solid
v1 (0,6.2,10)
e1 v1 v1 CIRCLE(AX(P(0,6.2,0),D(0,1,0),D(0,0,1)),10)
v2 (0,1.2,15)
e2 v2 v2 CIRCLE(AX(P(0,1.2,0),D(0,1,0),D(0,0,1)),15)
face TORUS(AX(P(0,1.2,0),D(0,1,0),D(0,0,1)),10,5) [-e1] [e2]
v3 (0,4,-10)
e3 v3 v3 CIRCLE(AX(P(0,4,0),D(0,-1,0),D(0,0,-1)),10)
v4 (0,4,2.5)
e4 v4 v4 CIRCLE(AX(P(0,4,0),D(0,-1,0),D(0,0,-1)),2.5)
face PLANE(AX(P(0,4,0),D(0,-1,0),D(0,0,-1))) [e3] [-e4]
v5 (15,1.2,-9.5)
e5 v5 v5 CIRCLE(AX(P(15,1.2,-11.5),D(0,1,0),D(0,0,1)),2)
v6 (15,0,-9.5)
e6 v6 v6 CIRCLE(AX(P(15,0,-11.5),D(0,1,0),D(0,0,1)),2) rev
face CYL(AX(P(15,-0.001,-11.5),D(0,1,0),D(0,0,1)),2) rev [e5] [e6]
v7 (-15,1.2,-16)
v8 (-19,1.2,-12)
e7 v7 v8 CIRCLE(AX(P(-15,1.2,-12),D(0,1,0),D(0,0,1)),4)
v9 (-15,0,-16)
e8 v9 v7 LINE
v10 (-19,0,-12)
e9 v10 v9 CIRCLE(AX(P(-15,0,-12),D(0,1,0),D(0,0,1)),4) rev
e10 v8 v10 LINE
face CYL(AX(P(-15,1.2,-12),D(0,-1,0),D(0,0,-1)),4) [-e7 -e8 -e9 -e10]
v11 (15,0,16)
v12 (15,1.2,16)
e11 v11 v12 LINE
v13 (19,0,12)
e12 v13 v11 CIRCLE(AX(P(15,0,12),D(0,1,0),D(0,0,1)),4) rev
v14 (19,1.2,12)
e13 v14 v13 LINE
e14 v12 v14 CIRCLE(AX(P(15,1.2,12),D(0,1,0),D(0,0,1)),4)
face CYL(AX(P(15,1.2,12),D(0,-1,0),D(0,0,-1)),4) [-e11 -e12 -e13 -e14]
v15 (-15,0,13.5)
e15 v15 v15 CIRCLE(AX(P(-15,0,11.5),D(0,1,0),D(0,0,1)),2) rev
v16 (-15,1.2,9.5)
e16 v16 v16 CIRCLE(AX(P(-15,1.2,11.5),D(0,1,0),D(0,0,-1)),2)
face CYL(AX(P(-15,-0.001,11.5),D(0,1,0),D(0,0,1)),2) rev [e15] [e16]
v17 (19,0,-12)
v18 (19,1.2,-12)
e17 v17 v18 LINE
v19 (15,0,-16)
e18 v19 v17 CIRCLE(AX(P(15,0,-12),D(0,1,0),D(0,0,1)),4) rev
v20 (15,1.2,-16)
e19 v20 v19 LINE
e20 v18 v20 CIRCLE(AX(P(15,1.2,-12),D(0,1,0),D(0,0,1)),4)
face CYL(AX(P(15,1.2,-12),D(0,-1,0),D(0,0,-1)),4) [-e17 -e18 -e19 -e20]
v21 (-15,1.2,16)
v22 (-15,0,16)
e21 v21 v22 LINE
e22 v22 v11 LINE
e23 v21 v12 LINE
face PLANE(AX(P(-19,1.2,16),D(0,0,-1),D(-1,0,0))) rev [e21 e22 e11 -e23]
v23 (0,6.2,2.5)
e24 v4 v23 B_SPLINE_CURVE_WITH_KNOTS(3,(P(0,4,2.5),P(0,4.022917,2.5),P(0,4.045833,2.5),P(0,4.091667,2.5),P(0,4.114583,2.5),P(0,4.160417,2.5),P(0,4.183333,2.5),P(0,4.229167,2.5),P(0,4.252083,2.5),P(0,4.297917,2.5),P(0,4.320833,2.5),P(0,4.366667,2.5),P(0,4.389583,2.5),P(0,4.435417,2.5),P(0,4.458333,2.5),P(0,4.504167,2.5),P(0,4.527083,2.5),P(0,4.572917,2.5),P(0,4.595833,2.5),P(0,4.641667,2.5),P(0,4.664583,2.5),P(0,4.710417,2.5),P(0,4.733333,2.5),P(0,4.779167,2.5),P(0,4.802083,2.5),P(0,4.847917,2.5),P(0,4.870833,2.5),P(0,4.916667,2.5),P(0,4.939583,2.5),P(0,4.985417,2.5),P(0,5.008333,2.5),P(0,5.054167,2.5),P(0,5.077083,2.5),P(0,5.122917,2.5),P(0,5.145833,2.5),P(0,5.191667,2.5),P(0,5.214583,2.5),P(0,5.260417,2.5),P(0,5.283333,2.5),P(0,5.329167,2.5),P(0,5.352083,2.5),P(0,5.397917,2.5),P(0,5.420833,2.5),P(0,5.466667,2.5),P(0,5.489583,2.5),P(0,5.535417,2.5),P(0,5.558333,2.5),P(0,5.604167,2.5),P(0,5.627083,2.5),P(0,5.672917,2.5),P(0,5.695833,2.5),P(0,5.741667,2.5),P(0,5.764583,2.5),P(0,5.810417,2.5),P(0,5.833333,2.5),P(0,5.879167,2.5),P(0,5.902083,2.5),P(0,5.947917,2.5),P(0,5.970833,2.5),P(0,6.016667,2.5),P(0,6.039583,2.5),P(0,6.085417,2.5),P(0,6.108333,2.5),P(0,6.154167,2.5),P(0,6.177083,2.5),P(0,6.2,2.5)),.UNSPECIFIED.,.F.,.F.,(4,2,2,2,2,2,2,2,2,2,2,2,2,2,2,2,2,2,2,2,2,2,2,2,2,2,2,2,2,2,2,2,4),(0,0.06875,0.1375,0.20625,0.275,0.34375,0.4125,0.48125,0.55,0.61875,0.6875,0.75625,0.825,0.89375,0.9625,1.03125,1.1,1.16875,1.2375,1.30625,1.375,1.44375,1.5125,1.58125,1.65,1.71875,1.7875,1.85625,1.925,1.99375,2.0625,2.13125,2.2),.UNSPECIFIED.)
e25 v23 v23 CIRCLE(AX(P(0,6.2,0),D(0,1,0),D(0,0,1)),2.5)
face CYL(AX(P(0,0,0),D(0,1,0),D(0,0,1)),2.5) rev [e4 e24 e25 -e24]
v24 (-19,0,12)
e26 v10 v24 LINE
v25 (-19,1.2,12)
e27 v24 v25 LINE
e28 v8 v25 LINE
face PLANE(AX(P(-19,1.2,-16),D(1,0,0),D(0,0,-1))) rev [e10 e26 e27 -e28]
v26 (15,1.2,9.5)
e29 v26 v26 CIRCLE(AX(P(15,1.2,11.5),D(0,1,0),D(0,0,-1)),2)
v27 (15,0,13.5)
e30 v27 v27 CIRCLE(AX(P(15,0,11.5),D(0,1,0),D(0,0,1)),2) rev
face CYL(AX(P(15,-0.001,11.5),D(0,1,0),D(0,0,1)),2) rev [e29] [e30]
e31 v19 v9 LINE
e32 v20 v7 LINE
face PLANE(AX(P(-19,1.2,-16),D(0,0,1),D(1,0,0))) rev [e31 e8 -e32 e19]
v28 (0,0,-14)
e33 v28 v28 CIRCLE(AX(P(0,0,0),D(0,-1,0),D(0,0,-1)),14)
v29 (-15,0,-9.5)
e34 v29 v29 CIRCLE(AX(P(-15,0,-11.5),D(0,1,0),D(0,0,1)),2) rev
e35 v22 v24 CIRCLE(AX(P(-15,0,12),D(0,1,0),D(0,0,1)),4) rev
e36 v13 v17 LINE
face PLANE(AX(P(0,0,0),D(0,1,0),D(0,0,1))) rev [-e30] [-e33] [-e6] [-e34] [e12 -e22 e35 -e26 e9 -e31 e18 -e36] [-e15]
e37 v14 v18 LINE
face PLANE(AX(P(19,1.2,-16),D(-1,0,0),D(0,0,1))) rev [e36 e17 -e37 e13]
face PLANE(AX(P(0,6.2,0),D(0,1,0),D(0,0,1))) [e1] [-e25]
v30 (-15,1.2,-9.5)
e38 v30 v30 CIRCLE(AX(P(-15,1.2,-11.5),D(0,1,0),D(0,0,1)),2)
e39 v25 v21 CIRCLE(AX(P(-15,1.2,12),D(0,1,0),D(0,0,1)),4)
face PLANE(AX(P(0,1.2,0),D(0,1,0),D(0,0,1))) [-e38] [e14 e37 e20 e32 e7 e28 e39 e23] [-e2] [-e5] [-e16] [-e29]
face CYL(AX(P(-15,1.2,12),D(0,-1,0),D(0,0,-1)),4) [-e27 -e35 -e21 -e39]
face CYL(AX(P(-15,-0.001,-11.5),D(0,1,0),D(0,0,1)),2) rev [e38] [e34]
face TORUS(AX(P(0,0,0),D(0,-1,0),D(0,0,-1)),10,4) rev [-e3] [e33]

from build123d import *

# Parameters (mm, degrees)
SKIZZE1_W                       = 38
SKIZZE1_H                       = 32
AUFSATZ_LINEAR_AUSTRAGEN1_DEPTH = 1.2
SKIZZE2_R                       = 15
AUFSATZ_LINEAR_AUSTRAGEN2_DEPTH = 5
VERRUNDUNG1_R                   = 5
SCHNITT_LINEAR_AUSTRAGEN1_REACH = 27.338
SKIZZE3_R                       = 2
SKIZZE4_R                       = 14
SCHNITT_LINEAR_AUSTRAGEN2_DEPTH = 4
VERRUNDUNG2_R                   = 4
SKIZZE5_R                       = 2.5
SCHNITT_LINEAR_AUSTRAGEN3_DEPTH = 26.601562452
VERRUNDUNG3_R                   = 4


with BuildPart() as part:
    # Skizze1 → Aufsatz-Linear austragen1 (new body)
    with BuildSketch(Plane(origin=(0, 0, 0), x_dir=(1, 0, 0), z_dir=(0, 1, 0))):
        Rectangle(SKIZZE1_W, SKIZZE1_H)
    extrude(amount=AUFSATZ_LINEAR_AUSTRAGEN1_DEPTH)

    # Skizze2 → Aufsatz-Linear austragen2 (add)
    with BuildSketch(Plane(origin=(0, 1.2, 0), x_dir=(1, 0, 0), z_dir=(0, 1, 0))):
        with Locations(Location((0, 0, 0), (0, 0, 270))):
            Circle(SKIZZE2_R)
    extrude(amount=AUFSATZ_LINEAR_AUSTRAGEN2_DEPTH)

    # Verrundung1
    verrundung1_edges = [part.edges().sort_by_distance(p)[0] for p in [
        (0, 6.2, -15),
    ]]
    fillet(verrundung1_edges, radius=VERRUNDUNG1_R - 0.0001)  # a hair under: the kernel refuses the full size

    # Skizze3 → Schnitt-Linear austragen1 (cut, up to next)
    with BuildSketch(Plane(origin=(0, 1.2, 0), x_dir=(1, 0, 0), z_dir=(0, 1, 0)), mode=Mode.PRIVATE) as schnitt_linear_austragen1_sk1:
        with Locations(Location((-15, 11.5, 0), (0, 0, 270))):
            Circle(SKIZZE3_R)
    schnitt_linear_austragen1_tool1 = extrude(schnitt_linear_austragen1_sk1.sketch, amount=-SCHNITT_LINEAR_AUSTRAGEN1_REACH, mode=Mode.PRIVATE) & part.part
    # Skizze3 → Schnitt-Linear austragen1 (cut, up to next)
    with BuildSketch(Plane(origin=(0, 1.2, 0), x_dir=(1, 0, 0), z_dir=(0, 1, 0)), mode=Mode.PRIVATE) as schnitt_linear_austragen1_sk2:
        with Locations(Location((15, 11.5, 0), (0, 0, 270))):
            Circle(SKIZZE3_R)
    schnitt_linear_austragen1_tool2 = extrude(schnitt_linear_austragen1_sk2.sketch, amount=-SCHNITT_LINEAR_AUSTRAGEN1_REACH, mode=Mode.PRIVATE) & part.part
    # Skizze3 → Schnitt-Linear austragen1 (cut, up to next)
    with BuildSketch(Plane(origin=(0, 1.2, 0), x_dir=(1, 0, 0), z_dir=(0, 1, 0)), mode=Mode.PRIVATE) as schnitt_linear_austragen1_sk3:
        with Locations(Location((15, -11.5, 0), (0, 0, 270))):
            Circle(SKIZZE3_R)
    schnitt_linear_austragen1_tool3 = extrude(schnitt_linear_austragen1_sk3.sketch, amount=-SCHNITT_LINEAR_AUSTRAGEN1_REACH, mode=Mode.PRIVATE) & part.part
    # Skizze3 → Schnitt-Linear austragen1 (cut, up to next)
    with BuildSketch(Plane(origin=(0, 1.2, 0), x_dir=(1, 0, 0), z_dir=(0, 1, 0)), mode=Mode.PRIVATE) as schnitt_linear_austragen1_sk4:
        with Locations(Location((-15, -11.5, 0), (0, 0, 270))):
            Circle(SKIZZE3_R)
    schnitt_linear_austragen1_tool4 = extrude(schnitt_linear_austragen1_sk4.sketch, amount=-SCHNITT_LINEAR_AUSTRAGEN1_REACH, mode=Mode.PRIVATE) & part.part
    add(schnitt_linear_austragen1_tool1.solids().sort_by_distance((-15, 1.2, -11.5))[0], mode=Mode.SUBTRACT)
    add(schnitt_linear_austragen1_tool2.solids().sort_by_distance((15, 1.2, -11.5))[0], mode=Mode.SUBTRACT)
    add(schnitt_linear_austragen1_tool3.solids().sort_by_distance((15, 1.2, 11.5))[0], mode=Mode.SUBTRACT)
    add(schnitt_linear_austragen1_tool4.solids().sort_by_distance((-15, 1.2, 11.5))[0], mode=Mode.SUBTRACT)

    # Skizze4 → Schnitt-Linear austragen2 (cut)
    with BuildSketch(Plane.XZ):
        with Locations(Location((0, 0, 0), (0, 0, 270))):
            Circle(SKIZZE4_R)
    extrude(amount=-SCHNITT_LINEAR_AUSTRAGEN2_DEPTH, mode=Mode.SUBTRACT)

    # Verrundung2
    verrundung2_edges = [part.edges().sort_by_distance(p)[0] for p in [
        (0, 4, 14),
    ]]
    fillet(verrundung2_edges, radius=VERRUNDUNG2_R - 0.0001)  # a hair under: the kernel refuses the full size

    # Skizze5 → Schnitt-Linear austragen3 (cut, through all)
    with BuildSketch(Plane(origin=(0, 6.2, 0), x_dir=(1, 0, 0), z_dir=(0, 1, 0))):
        with Locations(Location((0, 0, 0), (0, 0, 270))):
            Circle(SKIZZE5_R)
    extrude(amount=-SCHNITT_LINEAR_AUSTRAGEN3_DEPTH, mode=Mode.SUBTRACT)

    # Verrundung3
    verrundung3_edges = [part.edges().sort_by_distance(p)[0] for p in [
        (19, 0.6, 16),
        (-19, 0.6, 16),
        (-19, 0.6, -16),
        (19, 0.6, -16),
    ]]
    fillet(verrundung3_edges, radius=VERRUNDUNG3_R)


solid = part.part
